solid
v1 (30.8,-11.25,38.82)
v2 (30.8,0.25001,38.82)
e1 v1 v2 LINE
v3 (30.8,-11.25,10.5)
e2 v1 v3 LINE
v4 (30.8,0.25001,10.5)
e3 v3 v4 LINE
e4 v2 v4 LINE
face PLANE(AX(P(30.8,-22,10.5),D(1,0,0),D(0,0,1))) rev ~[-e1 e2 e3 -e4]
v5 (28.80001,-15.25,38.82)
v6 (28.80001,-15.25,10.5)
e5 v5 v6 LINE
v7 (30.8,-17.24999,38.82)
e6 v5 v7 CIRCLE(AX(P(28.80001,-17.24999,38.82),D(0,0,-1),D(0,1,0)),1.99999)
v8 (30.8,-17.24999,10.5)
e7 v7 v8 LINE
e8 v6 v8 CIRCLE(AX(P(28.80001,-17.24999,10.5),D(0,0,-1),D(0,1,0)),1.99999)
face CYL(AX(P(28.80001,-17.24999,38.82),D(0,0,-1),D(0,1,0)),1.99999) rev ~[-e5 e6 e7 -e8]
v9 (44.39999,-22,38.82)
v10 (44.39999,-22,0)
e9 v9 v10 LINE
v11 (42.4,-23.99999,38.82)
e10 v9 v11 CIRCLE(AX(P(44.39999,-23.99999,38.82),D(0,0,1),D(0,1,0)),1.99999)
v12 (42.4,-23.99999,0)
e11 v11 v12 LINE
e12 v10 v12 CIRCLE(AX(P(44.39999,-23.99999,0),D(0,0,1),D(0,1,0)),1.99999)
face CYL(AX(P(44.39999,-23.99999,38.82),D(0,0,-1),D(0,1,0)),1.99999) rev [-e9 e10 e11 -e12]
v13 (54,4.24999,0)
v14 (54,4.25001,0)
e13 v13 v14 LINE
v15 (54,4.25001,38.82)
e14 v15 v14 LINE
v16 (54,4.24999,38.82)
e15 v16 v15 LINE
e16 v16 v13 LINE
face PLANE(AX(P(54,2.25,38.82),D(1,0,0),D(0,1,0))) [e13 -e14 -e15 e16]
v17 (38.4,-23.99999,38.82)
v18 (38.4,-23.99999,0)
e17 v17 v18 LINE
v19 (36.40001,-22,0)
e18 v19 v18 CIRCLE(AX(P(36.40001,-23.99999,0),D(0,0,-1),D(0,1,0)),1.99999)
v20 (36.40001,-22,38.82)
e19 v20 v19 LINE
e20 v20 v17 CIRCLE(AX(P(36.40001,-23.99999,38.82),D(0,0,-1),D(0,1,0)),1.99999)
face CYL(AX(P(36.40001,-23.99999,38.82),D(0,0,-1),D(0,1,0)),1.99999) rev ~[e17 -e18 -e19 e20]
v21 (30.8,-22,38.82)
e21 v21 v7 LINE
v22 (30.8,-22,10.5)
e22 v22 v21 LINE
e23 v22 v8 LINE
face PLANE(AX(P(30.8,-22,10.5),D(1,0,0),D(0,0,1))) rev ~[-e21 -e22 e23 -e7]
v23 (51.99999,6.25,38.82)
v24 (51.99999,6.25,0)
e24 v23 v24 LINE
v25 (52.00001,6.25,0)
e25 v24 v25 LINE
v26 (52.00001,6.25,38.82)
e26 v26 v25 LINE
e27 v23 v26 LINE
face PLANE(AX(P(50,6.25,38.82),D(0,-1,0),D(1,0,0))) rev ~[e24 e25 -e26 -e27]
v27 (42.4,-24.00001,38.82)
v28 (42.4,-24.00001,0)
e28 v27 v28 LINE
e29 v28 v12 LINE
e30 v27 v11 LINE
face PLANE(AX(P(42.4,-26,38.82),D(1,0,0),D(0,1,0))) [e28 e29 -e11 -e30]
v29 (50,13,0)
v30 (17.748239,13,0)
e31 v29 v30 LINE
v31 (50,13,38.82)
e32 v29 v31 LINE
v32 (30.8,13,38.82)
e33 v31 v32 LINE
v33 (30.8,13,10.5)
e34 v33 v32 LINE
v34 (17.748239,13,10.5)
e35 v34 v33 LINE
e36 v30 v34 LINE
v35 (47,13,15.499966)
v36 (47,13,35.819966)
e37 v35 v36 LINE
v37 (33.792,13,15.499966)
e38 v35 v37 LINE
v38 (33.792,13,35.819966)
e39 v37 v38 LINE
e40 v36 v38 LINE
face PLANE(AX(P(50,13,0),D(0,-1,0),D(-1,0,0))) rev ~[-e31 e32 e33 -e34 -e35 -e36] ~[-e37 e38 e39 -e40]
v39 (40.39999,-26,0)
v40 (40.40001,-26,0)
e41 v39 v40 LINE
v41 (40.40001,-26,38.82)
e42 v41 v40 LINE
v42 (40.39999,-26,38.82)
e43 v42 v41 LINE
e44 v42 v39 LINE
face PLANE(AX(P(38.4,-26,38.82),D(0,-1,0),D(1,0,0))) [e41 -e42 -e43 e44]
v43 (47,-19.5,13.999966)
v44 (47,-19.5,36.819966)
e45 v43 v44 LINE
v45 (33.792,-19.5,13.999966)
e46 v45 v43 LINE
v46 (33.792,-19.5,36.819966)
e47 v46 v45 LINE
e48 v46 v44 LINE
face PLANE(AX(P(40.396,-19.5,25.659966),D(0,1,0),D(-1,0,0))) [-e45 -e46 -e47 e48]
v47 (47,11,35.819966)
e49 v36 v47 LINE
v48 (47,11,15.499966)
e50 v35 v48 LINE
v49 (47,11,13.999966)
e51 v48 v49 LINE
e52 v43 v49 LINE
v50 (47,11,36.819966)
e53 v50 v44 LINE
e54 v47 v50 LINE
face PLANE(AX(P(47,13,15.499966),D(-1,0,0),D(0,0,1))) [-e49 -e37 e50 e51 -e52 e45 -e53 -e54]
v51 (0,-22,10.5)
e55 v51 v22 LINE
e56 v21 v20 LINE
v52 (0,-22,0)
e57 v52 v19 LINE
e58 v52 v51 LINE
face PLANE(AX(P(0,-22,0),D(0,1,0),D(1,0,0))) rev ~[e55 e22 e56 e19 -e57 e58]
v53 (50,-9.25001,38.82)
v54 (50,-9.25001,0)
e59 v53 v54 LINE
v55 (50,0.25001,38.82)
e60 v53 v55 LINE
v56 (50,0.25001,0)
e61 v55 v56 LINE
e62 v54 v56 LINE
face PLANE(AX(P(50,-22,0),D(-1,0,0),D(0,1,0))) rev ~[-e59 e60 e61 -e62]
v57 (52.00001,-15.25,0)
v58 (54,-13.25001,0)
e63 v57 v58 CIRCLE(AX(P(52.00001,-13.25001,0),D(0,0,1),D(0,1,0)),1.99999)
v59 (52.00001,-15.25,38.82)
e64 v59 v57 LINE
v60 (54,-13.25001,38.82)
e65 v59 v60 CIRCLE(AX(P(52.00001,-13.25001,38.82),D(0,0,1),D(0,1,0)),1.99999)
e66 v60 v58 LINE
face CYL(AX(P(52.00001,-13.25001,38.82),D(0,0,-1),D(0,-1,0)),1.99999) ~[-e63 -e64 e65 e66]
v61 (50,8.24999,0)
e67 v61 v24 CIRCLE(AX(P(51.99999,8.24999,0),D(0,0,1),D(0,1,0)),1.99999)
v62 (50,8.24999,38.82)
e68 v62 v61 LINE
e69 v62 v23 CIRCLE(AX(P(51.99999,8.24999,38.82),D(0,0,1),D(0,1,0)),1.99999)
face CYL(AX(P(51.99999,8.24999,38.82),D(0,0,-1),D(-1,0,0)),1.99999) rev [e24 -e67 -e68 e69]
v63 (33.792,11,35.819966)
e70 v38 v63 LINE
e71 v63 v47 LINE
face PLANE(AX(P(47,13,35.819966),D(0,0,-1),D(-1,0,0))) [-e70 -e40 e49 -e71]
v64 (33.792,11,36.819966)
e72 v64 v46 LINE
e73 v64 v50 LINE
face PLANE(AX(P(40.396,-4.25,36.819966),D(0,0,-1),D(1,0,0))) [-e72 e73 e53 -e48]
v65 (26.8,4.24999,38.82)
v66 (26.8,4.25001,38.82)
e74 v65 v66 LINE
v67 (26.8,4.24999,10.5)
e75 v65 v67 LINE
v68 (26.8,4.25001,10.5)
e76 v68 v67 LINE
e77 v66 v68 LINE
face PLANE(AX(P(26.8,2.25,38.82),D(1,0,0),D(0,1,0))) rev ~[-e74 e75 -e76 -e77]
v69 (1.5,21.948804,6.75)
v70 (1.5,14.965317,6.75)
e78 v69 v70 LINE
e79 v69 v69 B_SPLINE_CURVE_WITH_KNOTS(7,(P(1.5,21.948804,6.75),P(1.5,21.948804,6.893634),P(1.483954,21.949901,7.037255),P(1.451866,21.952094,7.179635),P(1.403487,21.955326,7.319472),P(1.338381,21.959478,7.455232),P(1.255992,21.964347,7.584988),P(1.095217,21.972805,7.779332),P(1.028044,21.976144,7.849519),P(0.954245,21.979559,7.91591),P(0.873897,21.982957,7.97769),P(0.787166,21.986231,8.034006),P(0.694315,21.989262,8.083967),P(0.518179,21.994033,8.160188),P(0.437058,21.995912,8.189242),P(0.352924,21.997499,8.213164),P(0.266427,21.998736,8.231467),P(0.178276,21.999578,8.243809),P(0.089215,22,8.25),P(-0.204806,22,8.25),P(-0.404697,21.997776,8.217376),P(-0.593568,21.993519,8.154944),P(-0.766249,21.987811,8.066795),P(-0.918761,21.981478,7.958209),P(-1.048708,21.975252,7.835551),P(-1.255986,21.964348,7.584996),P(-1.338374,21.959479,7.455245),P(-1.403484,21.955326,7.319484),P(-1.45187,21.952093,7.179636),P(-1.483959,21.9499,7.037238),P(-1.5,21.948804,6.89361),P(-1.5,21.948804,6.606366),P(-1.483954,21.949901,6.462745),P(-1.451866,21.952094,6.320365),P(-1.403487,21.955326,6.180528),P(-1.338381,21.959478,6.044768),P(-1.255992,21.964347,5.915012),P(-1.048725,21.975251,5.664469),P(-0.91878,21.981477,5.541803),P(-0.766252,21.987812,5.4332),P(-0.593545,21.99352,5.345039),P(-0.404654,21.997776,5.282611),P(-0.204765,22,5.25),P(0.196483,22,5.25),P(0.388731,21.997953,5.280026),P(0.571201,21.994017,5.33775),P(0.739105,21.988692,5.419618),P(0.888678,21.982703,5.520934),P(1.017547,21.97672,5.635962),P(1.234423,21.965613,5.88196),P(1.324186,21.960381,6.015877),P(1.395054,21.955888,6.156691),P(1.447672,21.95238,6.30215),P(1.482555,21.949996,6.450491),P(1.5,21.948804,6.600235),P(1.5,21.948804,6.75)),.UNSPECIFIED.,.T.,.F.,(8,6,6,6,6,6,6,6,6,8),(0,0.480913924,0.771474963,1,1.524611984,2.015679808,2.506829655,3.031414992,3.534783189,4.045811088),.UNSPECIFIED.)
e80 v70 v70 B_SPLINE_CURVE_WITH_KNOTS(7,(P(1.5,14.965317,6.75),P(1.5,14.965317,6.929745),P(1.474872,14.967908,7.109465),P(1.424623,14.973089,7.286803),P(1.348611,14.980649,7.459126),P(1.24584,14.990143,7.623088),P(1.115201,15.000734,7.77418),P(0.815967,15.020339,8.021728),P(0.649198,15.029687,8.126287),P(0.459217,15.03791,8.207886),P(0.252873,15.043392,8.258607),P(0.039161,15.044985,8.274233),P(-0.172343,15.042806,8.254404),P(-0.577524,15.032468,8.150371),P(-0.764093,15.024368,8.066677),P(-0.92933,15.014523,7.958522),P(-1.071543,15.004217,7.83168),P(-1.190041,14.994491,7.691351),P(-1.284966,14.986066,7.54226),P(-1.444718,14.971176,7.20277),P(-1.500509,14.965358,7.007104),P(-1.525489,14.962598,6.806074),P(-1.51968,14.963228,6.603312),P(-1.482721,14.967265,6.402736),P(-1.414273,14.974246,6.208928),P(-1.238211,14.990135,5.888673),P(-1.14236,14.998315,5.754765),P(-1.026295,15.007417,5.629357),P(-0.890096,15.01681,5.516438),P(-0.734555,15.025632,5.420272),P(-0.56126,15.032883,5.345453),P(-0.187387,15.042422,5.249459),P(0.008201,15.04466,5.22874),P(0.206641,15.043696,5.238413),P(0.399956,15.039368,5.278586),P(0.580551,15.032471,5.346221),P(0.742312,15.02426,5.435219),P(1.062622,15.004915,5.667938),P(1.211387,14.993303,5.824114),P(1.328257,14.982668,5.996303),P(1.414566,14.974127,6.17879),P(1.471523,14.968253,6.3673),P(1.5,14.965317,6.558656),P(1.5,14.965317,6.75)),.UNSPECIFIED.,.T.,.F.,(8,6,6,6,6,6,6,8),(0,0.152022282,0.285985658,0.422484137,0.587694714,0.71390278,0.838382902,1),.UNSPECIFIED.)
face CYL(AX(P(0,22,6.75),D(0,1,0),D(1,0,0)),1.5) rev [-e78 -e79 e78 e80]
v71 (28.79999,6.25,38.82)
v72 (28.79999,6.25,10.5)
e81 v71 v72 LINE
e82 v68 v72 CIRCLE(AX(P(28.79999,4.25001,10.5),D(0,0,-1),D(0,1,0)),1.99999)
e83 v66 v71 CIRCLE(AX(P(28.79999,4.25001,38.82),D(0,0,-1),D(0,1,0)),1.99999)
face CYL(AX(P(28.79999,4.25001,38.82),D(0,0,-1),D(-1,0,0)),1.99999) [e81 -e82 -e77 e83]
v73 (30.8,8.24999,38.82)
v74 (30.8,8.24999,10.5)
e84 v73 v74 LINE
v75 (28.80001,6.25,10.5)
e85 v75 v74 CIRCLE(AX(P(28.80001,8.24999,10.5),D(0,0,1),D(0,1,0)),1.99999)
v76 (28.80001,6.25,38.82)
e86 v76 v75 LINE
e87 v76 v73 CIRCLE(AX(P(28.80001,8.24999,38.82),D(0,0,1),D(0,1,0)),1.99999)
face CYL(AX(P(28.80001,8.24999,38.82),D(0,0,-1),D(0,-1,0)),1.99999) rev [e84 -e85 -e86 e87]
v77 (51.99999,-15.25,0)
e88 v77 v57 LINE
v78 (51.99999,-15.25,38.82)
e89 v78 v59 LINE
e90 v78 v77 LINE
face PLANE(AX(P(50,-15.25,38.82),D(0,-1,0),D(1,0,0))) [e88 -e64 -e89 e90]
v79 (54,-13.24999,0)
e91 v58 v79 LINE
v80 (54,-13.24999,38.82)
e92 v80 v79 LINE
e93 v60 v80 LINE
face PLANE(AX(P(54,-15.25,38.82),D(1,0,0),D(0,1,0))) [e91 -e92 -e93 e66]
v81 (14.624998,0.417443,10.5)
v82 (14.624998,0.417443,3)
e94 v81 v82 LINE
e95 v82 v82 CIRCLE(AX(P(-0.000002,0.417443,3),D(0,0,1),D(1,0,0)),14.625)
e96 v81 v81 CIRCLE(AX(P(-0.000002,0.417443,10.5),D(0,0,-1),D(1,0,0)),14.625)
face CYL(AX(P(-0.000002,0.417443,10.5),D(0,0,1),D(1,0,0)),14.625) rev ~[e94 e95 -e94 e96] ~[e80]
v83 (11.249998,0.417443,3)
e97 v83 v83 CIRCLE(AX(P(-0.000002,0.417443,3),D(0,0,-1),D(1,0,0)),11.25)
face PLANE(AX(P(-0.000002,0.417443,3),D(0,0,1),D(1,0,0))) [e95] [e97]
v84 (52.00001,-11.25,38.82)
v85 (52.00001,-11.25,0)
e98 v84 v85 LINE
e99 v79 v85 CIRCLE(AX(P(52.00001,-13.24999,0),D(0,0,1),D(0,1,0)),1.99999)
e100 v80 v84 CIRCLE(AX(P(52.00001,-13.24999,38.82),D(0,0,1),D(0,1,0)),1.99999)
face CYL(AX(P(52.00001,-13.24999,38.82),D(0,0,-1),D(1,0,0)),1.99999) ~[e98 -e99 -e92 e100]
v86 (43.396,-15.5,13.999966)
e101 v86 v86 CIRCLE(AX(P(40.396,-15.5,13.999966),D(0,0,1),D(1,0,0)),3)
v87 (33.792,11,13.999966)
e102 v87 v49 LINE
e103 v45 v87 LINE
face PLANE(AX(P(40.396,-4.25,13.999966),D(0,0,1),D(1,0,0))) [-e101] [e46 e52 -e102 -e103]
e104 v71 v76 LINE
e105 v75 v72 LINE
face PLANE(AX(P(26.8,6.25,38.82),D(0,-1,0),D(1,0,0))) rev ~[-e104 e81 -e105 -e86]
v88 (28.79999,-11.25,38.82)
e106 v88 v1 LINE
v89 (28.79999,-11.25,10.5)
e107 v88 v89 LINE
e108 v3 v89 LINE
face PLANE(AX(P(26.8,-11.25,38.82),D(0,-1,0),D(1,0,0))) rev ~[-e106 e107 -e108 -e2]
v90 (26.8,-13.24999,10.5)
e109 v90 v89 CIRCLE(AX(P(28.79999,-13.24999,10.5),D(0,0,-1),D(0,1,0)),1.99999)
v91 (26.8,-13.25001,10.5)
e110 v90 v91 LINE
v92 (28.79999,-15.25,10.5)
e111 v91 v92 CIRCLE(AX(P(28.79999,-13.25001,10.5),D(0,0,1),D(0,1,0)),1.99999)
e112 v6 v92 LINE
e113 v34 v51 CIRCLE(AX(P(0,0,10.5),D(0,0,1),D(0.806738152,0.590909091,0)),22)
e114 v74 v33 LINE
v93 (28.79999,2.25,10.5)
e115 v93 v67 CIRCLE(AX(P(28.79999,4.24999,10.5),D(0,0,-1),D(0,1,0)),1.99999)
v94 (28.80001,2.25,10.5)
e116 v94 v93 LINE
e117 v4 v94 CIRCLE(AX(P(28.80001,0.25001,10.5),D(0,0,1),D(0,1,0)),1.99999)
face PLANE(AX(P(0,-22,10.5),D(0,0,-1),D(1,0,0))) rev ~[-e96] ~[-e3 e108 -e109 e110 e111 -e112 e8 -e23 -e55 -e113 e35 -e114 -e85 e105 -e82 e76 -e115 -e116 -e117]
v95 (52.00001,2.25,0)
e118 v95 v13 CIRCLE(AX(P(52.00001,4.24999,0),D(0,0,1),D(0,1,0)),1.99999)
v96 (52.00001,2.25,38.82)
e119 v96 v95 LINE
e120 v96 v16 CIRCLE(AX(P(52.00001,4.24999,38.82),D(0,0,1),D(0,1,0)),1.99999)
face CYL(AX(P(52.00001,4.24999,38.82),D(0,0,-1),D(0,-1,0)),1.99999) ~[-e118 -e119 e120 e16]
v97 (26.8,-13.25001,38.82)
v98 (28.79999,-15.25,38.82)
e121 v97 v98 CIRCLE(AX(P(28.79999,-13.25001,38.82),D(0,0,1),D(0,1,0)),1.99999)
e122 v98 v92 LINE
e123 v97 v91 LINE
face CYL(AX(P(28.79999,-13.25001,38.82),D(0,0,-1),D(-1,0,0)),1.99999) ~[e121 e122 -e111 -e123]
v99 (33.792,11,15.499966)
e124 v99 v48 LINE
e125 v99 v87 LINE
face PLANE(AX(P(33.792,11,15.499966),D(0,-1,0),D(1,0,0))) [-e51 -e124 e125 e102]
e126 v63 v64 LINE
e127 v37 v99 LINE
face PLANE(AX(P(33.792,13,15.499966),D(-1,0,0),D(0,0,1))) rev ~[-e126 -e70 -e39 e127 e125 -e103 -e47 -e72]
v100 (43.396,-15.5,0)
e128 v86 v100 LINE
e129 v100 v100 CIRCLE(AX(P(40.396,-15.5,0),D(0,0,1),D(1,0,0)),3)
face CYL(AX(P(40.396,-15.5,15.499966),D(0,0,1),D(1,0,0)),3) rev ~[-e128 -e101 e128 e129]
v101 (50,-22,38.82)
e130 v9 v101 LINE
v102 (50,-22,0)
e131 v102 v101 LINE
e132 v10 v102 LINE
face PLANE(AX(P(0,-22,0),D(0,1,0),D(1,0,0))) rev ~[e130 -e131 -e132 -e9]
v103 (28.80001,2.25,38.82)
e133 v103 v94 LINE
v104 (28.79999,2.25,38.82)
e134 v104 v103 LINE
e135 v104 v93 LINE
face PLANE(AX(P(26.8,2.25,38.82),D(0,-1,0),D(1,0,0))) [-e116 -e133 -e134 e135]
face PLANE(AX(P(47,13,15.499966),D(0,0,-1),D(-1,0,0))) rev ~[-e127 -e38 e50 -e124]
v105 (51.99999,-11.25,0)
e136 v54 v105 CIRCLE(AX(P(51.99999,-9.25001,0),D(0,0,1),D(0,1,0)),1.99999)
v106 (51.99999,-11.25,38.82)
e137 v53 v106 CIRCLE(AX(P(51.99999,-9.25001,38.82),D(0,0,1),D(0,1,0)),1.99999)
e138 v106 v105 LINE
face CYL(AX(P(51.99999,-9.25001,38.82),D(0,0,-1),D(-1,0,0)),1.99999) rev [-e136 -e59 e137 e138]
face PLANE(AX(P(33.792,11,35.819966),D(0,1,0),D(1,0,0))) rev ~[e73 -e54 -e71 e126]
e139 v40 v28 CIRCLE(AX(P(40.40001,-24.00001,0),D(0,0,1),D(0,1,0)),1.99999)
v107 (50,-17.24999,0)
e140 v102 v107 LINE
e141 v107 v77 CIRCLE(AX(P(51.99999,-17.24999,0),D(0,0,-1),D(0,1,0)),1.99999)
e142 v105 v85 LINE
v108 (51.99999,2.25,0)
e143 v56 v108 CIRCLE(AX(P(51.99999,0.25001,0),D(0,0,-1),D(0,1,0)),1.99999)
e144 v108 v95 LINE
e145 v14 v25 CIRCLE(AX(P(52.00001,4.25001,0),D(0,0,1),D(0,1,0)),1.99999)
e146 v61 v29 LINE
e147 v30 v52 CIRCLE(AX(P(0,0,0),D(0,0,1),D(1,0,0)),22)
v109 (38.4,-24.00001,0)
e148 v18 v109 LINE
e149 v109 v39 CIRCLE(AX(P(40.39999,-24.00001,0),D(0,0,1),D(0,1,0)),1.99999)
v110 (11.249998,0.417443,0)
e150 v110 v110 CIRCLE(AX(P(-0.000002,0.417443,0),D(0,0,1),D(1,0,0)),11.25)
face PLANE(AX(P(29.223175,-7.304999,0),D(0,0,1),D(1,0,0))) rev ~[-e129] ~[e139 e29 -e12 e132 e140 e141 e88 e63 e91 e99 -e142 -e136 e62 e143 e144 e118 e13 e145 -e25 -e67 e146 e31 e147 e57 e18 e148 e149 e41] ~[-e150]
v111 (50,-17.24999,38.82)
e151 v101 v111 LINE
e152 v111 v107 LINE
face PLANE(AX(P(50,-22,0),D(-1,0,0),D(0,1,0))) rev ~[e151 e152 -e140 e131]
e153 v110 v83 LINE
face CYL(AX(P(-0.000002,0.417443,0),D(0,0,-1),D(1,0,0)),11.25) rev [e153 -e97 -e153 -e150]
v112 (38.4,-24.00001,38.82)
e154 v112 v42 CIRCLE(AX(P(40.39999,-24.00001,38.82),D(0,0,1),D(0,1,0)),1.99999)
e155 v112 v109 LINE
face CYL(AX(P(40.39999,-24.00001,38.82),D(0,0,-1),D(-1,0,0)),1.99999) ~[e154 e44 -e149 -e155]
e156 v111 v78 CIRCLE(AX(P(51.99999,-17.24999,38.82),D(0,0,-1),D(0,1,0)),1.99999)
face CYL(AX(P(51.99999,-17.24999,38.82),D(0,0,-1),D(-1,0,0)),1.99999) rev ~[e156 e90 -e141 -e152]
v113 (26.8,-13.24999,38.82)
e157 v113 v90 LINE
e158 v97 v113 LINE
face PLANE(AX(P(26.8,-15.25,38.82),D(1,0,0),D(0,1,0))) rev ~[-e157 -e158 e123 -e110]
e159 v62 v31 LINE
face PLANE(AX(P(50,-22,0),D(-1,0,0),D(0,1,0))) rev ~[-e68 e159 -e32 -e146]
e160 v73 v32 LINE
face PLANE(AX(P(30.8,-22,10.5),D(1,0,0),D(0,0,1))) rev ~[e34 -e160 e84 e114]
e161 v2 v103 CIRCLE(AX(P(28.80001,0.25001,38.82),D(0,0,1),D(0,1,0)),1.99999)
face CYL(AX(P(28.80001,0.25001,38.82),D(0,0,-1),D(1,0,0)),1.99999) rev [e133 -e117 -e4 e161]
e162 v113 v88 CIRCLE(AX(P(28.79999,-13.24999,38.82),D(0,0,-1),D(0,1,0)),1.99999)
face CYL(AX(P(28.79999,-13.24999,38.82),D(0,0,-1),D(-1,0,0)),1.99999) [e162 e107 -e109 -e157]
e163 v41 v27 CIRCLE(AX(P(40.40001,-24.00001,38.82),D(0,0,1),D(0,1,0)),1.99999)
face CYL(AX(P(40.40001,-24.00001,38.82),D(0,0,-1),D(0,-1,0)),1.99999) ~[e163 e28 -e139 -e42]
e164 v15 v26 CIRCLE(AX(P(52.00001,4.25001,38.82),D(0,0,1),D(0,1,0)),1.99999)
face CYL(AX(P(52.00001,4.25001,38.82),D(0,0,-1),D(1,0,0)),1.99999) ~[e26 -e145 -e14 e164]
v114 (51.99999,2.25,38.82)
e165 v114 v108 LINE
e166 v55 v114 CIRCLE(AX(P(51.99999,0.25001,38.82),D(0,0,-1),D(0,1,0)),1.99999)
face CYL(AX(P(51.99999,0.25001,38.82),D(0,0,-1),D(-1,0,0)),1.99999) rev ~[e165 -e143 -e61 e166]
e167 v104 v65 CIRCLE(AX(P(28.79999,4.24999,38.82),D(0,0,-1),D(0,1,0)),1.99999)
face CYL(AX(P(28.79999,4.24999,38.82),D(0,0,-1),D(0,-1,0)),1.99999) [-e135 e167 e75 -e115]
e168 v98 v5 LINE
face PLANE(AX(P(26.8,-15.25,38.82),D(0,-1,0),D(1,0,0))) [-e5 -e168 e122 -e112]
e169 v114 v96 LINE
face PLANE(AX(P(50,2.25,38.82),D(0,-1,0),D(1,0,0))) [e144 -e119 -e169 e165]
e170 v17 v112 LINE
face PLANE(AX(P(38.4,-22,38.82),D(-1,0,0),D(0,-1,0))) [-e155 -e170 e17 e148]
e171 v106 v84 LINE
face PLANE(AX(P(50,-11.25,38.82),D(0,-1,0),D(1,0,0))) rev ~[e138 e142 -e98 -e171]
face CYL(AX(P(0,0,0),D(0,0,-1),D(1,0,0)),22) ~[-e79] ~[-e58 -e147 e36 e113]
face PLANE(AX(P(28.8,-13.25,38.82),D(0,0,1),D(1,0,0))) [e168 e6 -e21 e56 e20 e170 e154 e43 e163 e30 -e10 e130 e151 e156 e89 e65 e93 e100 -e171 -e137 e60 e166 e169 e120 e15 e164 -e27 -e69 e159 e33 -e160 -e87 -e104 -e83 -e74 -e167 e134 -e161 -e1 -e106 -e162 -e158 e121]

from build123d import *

# Parameters (mm, degrees)
F0_R      = 22
F0_R_2    = 11.25
F1_DEPTH  = 10.5
F3_DEPTH  = 38.82
F4_R      = 14.625
F4_R_2    = 11.125
F5_DEPTH  = 7.5
F8_W      = 13.208
F8_H      = 20.32
F9_DEPTH  = 32.5
F10_R     = 3
F11_DEPTH = 15.4999664724
F12_W     = 13.208
F12_H     = 30.5
F13_DEPTH = 1.5
F14_W     = 13.208
F14_H     = 30.5
F15_DEPTH = 1
F16_W     = 30.8
F16_H     = 28.32
F17_DEPTH = 44.001
F18_W     = 4
F18_H     = 4
F19_DEPTH = 38.82
F20_R     = 1.99999
F7_R      = 1.5
F21_DEPTH = 10


# Not quite as in the source:
# - a fillet or chamfer is up to 0.001 mm smaller than in the source, because OpenCascade refuses the exact size
# - a feature names something its author has since deleted; it is built from what else it names


with BuildPart() as f1:
    # F0 (on Top) → F1 (new body)
    with BuildSketch(Plane.XY):
        Circle(F0_R)
        with Locations((-1.609e-06, 0.4174434871)):
            Circle(F0_R_2, mode=Mode.SUBTRACT)
    extrude(amount=F1_DEPTH)

    # F2 (on Top) → F3 (join)
    with BuildSketch(Plane.XY):
        with BuildLine():
            Line((0, -22), (50, -22))
            Line((50, -22), (50, 13))
            Line((50, 13), (17.7482393493, 13))
            ThreePointArc((17.7482393493, 13), (19.6214168703, -9.9498743711), (0, -22))
        make_face()
    extrude(amount=F3_DEPTH)

    # F4 (on face) → F5 (cut)
    with BuildSketch(Plane.XY.offset(10.5)):
        with Locations((-1.609e-06, 0.4174434871)):
            Circle(F4_R)
        with Locations((-1.609e-06, 0.4174434871)):
            Circle(F4_R_2, mode=Mode.SUBTRACT)
    extrude(amount=-F5_DEPTH, mode=Mode.SUBTRACT)

    # F8 (on face) → F9 (cut)
    with BuildSketch(Plane(origin=(0, 13, 0), x_dir=(-1, 0, 0), z_dir=(0, 1, 0))):
        with Locations((-40.396, 25.6599664724)):
            Rectangle(F8_W, F8_H)
    extrude(amount=-F9_DEPTH, mode=Mode.SUBTRACT)

    # F10 (on face) → F11 (cut, through all)
    with BuildSketch(Plane.XY.offset(15.4999664724)):
        with Locations((40.396, -15.5)):
            Circle(F10_R)
    extrude(amount=-F11_DEPTH, mode=Mode.SUBTRACT)

    # F12 (on face) → F13 (cut)
    with BuildSketch(Plane.XY.offset(15.4999664724)):
        with Locations((40.396, -4.25)):
            Rectangle(F12_W, F12_H)
    extrude(amount=-F13_DEPTH, mode=Mode.SUBTRACT)

    # F14 (on face) → F15 (cut)
    with BuildSketch(Plane(origin=(0, 0, 35.8199664724), x_dir=(1, 0, 0), z_dir=(0, 0, -1))):
        with Locations((40.396, 4.25)):
            Rectangle(F14_W, F14_H)
    extrude(amount=-F15_DEPTH, mode=Mode.SUBTRACT)

    # F16 (on face) → F17 (cut, through all)
    with BuildSketch(Plane.XZ.offset(22)):
        with Locations((15.4, 24.66)):
            Rectangle(F16_W, F16_H)
    extrude(amount=-F17_DEPTH, mode=Mode.SUBTRACT)

    # F18 (on face) → F19 (join, through all)
    with BuildSketch(Plane.XY.offset(38.82)):
        with Locations((52, 4.25)):
            Rectangle(F18_W, F18_H)
        with Locations((52, -13.25)):
            Rectangle(F18_W, F18_H)
        with Locations((28.8, -13.25)):
            Rectangle(F18_W, F18_H)
        with Locations((28.8, 4.25)):
            Rectangle(F18_W, F18_H)
        Polygon((40.4, -22), (38.4, -22), (38.4, -26), (42.4, -26), (42.4, -22), align=None)
    extrude(amount=-F19_DEPTH)

    # F20 (radius 2 in the source; OpenCascade refuses exactly that, so slightly less here)
    f20_edges = [f1.edges().sort_by_distance(p)[0] for p in [
        (42.4, -26, 19.41),
        (38.4, -26, 19.41),
        (42.4, -22, 19.41),
        (50, -15.25, 19.41),
        (54, -15.25, 19.41),
        (54, -11.25, 19.41),
        (50, 2.25, 19.41),
        (54, 2.25, 19.41),
        (54, 6.25, 19.41),
        (26.8, 2.25, 24.66),
        (26.8, -15.25, 24.66),
        (50, -11.25, 19.41),
        (50, 6.25, 19.41),
        (38.4, -22, 19.41),
        (26.8, -11.25, 24.66),
        (26.8, 6.25, 24.66),
        (30.8, 6.25, 24.66),
        (30.8, 2.25, 24.66),
        (30.8, -15.25, 24.66),
    ]]
    fillet(f20_edges, radius=F20_R)

    # F7 (on offset) → F21 (cut)
    with BuildSketch(Plane.XZ.offset(-22)):
        with Locations((0, 6.75)):
            Circle(F7_R)
    extrude(amount=F21_DEPTH, mode=Mode.SUBTRACT)


solid = f1.part
